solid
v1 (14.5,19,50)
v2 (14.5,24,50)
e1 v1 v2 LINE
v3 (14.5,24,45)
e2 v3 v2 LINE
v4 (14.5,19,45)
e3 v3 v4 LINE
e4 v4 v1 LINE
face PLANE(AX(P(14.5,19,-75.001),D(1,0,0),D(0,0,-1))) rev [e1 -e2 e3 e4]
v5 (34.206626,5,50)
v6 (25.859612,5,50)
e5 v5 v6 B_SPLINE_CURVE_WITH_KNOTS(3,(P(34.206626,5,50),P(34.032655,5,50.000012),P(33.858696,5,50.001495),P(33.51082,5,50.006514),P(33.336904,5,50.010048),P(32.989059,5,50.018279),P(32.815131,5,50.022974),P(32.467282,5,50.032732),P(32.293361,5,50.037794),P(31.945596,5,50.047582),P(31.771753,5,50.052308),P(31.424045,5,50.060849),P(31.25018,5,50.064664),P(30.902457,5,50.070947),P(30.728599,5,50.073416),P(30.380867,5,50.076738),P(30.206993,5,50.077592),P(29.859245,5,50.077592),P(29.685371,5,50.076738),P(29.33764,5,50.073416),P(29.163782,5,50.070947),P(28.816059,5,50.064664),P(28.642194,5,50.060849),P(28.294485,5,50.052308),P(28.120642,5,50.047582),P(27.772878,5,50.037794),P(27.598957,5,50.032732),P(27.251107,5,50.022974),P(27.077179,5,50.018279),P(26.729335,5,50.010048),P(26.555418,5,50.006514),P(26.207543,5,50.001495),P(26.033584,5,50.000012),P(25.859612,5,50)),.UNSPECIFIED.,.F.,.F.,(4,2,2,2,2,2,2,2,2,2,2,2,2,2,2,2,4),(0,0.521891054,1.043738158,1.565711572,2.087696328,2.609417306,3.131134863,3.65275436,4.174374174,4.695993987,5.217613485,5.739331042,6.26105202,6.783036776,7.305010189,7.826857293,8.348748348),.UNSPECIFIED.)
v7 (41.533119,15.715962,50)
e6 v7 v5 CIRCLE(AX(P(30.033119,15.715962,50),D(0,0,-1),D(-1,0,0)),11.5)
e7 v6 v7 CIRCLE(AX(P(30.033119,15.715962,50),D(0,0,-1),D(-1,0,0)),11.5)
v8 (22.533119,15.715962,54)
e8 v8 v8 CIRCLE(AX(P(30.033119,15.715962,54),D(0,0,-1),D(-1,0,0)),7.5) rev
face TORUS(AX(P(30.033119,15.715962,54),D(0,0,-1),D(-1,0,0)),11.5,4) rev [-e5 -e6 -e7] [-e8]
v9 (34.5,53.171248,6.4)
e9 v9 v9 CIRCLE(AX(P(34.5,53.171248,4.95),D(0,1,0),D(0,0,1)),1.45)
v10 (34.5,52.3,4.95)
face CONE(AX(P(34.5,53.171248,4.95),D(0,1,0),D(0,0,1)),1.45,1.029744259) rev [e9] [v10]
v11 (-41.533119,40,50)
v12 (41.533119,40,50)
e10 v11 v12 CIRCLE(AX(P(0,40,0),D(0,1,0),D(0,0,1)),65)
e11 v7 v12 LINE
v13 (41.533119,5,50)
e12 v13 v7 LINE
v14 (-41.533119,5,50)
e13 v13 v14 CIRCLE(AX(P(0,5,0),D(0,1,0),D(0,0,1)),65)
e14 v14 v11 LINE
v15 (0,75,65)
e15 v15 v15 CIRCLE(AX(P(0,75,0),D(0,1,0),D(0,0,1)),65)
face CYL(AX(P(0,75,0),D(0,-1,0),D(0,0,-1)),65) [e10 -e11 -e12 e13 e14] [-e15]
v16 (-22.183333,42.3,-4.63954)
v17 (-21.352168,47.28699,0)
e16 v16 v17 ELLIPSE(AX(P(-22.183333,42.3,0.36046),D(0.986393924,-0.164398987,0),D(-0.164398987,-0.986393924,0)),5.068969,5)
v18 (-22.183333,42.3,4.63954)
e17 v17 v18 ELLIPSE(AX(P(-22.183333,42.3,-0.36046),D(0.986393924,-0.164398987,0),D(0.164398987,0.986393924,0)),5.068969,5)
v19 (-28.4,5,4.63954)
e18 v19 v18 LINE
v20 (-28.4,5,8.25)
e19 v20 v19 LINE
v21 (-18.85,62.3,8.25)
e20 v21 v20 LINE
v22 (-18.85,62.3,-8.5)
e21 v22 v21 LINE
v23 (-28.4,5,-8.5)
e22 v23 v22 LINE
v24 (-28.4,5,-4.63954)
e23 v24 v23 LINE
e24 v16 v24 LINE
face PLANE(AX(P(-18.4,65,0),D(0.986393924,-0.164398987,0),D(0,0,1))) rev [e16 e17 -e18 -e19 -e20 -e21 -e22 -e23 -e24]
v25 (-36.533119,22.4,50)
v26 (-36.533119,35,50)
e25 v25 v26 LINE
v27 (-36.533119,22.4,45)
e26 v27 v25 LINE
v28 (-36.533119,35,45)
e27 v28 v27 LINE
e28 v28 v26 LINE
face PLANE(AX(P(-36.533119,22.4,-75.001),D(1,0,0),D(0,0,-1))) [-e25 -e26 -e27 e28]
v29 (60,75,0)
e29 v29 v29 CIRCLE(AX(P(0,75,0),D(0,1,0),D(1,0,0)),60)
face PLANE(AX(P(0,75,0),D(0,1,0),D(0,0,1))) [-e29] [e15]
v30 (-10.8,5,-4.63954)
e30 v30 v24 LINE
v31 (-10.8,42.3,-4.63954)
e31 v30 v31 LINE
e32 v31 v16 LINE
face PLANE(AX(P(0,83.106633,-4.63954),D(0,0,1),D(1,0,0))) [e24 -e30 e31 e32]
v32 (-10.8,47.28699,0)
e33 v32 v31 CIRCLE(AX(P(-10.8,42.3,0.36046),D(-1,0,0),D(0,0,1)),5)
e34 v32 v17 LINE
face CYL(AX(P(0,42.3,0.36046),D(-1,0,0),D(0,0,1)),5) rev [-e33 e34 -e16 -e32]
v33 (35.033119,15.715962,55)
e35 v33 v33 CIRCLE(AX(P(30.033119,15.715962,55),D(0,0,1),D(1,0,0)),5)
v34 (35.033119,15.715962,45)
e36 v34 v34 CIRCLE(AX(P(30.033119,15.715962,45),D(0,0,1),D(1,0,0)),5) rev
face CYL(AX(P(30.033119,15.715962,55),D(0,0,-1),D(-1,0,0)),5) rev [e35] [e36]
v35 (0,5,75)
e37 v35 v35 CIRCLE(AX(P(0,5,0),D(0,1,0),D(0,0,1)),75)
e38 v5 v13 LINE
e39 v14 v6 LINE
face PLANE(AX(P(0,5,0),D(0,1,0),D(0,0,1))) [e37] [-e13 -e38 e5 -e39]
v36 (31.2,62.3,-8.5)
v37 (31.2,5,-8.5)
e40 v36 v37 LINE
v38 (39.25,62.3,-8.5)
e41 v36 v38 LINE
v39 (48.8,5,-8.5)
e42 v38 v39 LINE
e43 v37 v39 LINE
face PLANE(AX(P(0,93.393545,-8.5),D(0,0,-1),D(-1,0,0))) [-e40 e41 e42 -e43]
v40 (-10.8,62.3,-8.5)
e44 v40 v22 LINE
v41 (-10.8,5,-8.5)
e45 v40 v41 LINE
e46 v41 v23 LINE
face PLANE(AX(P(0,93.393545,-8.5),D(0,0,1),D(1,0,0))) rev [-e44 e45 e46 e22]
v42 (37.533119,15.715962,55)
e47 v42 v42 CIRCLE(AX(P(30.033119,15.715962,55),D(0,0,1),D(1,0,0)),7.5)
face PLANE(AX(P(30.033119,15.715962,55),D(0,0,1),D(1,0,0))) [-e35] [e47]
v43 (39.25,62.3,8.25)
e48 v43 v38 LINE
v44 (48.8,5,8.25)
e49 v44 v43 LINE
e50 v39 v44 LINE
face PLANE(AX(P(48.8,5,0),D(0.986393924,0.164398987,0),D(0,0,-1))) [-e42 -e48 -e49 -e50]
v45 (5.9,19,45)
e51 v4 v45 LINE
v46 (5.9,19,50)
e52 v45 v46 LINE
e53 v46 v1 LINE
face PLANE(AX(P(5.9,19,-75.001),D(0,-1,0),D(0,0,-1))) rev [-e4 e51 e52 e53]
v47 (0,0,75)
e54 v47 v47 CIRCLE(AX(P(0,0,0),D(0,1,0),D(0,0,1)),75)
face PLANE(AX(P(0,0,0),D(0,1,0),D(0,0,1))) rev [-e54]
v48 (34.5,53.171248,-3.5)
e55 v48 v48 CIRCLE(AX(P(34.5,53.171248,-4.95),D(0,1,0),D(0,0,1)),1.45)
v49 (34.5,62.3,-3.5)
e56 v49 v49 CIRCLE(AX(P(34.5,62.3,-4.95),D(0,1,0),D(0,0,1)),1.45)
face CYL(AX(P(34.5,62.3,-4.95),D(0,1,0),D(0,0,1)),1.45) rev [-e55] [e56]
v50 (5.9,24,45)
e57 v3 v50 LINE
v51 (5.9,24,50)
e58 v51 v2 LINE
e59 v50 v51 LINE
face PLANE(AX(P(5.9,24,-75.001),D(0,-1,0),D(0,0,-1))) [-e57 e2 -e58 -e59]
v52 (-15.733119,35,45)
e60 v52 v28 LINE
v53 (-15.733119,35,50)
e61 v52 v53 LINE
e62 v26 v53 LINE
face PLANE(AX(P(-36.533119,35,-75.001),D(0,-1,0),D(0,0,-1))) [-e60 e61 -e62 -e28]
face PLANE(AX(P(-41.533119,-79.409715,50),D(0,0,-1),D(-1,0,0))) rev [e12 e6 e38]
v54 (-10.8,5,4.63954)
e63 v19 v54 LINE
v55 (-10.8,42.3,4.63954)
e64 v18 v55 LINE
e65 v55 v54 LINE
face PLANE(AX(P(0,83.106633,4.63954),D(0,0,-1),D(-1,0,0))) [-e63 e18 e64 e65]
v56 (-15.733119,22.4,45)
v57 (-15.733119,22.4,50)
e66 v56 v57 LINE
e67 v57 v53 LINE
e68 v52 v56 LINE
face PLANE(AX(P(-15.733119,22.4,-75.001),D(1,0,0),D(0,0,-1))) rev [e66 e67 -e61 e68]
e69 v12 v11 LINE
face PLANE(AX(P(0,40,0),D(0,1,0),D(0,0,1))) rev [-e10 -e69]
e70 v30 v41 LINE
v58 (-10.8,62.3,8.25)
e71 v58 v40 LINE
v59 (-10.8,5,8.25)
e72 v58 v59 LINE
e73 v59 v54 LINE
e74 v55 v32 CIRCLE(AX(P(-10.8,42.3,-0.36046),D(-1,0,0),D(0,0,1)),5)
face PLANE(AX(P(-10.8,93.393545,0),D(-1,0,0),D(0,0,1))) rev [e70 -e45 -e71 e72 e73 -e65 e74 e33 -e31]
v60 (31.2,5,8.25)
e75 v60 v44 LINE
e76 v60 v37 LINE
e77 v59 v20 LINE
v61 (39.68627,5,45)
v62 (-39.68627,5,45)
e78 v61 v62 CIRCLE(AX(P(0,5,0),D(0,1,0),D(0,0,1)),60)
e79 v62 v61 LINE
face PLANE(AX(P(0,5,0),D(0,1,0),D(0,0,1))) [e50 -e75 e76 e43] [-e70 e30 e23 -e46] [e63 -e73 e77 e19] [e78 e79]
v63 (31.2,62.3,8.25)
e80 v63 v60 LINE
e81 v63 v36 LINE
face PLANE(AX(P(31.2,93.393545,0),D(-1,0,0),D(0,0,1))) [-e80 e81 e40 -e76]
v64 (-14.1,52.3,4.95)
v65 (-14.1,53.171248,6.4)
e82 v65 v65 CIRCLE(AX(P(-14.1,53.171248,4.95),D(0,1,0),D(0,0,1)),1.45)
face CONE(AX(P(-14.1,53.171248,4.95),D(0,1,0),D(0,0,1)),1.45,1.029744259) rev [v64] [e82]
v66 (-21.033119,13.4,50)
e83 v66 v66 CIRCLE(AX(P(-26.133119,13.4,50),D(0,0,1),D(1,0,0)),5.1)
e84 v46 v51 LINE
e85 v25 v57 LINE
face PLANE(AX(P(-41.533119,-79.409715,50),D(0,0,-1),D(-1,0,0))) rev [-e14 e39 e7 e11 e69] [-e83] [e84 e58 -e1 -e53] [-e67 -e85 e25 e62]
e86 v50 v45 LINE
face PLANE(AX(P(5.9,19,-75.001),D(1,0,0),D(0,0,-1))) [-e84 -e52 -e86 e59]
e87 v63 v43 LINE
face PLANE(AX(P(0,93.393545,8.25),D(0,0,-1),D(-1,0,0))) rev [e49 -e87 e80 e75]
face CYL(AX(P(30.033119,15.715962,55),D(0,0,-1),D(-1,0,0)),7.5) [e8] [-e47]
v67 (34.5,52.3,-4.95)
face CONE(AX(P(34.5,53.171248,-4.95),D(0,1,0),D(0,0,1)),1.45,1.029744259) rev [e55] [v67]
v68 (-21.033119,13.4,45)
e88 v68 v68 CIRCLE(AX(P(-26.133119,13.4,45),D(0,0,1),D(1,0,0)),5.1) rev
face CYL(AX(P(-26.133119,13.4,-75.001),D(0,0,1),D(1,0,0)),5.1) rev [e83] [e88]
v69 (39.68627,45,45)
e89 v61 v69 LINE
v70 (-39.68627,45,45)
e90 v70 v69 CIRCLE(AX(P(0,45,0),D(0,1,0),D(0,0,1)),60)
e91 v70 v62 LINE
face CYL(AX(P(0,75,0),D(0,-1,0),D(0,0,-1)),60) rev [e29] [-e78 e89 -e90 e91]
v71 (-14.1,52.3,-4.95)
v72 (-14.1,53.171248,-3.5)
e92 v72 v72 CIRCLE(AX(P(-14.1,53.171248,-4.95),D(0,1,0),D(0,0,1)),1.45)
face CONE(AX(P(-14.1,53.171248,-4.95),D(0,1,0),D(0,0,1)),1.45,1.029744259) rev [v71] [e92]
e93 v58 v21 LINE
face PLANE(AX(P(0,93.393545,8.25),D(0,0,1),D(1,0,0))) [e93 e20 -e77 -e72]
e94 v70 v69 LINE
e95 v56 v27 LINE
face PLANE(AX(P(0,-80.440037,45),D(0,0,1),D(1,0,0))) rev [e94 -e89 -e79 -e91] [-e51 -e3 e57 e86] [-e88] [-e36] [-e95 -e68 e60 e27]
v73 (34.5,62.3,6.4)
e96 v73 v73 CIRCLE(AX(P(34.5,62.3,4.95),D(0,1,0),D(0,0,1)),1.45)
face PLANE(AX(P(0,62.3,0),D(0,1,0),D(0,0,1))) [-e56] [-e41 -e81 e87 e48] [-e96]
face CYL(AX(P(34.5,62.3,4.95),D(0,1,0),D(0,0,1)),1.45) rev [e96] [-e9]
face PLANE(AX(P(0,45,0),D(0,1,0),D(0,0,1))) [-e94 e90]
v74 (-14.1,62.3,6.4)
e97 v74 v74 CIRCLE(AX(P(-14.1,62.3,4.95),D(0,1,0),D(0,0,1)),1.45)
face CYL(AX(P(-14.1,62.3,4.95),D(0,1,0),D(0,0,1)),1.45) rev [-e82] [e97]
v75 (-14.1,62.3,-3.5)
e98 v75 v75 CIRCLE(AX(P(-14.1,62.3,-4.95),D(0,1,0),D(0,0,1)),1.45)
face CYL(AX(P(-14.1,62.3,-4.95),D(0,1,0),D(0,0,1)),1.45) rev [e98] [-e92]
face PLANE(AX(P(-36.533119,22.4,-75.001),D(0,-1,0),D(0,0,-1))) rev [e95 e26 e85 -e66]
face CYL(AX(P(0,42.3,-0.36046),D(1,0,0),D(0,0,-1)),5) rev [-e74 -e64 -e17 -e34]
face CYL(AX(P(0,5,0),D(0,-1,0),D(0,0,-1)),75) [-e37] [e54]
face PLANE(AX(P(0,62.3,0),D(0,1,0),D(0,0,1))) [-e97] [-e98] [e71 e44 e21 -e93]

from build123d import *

# Parameters (mm, degrees)
SKETCH4_R                   = 65
SKETCH4_R_2                 = 60
EXTRUDE_THIN1_DEPTH         = 75
SKETCH5_R                   = 75
BOSS_EXTRUDE1_DEPTH         = 5
BOSS_EXTRUDE2_START         = -40
SKETCH6_W                   = 83.06623863
SKETCH6_H                   = 5
BOSS_EXTRUDE2_DEPTH         = 40
CUT_EXTRUDE1_START          = -40
CUT_EXTRUDE1_DEPTH          = 35
SKETCH8_W                   = 7.6
SKETCH8_H                   = 16.75
BOSS_EXTRUDE3_DEPTH         = 57.3
CHAMFER1_SIZE               = 10
CHAMFER1_SIZE_2             = 60
M3_5X0_6_TAPPED_HOLE1_D     = 2.9
M3_5X0_6_TAPPED_HOLE1_DEPTH = 9.128752102
M3_5X0_6_TAPPED_HOLE1_TIP   = 0.871247898
CUT_EXTRUDE2_START          = -57.3
SKETCH11_W                  = 18.622960368
SKETCH11_H                  = 9.279079534
CUT_EXTRUDE2_DEPTH          = 42.3
FILLET1_R                   = 5
CUT_EXTRUDE3_REACH          = 165.936
SKETCH12_R                  = 5.1
SKETCH12_W                  = 20.8
SKETCH12_H                  = 12.6
SKETCH12_W_2                = 8.6
SKETCH12_H_2                = 5
SKETCH13_R                  = 7.5
SKETCH13_R_2                = 5
BOSS_EXTRUDE4_DEPTH         = 5
FILLET2_R                   = 4
CUT_EXTRUDE4_REACH          = 165.936
SKETCH14_R                  = 5


with BuildPart() as part:
    # Sketch4 → Extrude-Thin1 (new body)
    with BuildSketch(Plane(origin=(0, 0, 0), x_dir=(1, 0, 0), z_dir=(0, 1, 0))):
        Circle(SKETCH4_R)
        Circle(SKETCH4_R_2, mode=Mode.SUBTRACT)
    extrude(amount=EXTRUDE_THIN1_DEPTH)

    # Sketch5 → Boss-Extrude1 (add)
    with BuildSketch(Plane(origin=(0, 0, 0), x_dir=(1, 0, 0), z_dir=(0, 1, 0))):
        with Locations(Location((0, 0, 0), (0, 0, 270))):
            Circle(SKETCH5_R)
    extrude(amount=BOSS_EXTRUDE1_DEPTH)

    # Sketch6 → Boss-Extrude2 (add)
    with BuildSketch(Plane(origin=(0, 45, 0), x_dir=(1, 0, 0), z_dir=(0, 1, 0)).offset(BOSS_EXTRUDE2_START)):
        with Locations((0, -47.5)):
            Rectangle(SKETCH6_W, SKETCH6_H)
        with BuildLine():
            Line((41.533119315, -50), (0, -50))
            Line((0, -50), (0, -65))
            ThreePointArc((0, -65), (22.079402166, -61.135096303), (41.533119315, -50))
        make_face()
        with BuildLine():
            Line((0, -65), (0, -50))
            Line((0, -50), (-41.533119315, -50))
            ThreePointArc((-41.533119315, -50), (-22.079402166, -61.135096303), (0, -65))
        make_face()
        with BuildLine():
            Line((41.533119315, -50), (0, -50))
            Line((0, -50), (0, -65))
            ThreePointArc((0, -65), (22.079402166, -61.135096303), (41.533119315, -50))
        make_face()
        with BuildLine():
            Line((0, -65), (0, -50))
            Line((0, -50), (-41.533119315, -50))
            ThreePointArc((-41.533119315, -50), (-22.079402166, -61.135096303), (0, -65))
        make_face()
    extrude(amount=BOSS_EXTRUDE2_DEPTH)

    # Sketch7 → Cut-Extrude1 (cut)
    with BuildSketch(Plane(origin=(0, 45, 0), x_dir=(1, 0, 0), z_dir=(0, 1, 0)).offset(CUT_EXTRUDE1_START)):
        with BuildLine():
            Line((-41.533119315, -50), (41.533119315, -50))
            ThreePointArc((41.533119315, -50), (0, -65), (-41.533119315, -50))
        make_face()
    extrude(amount=CUT_EXTRUDE1_DEPTH, mode=Mode.SUBTRACT)

    # Sketch8 → Boss-Extrude3 (add)
    with BuildSketch(Plane(origin=(0, 5, 0), x_dir=(1, 0, 0), z_dir=(0, 1, 0))):
        with Locations((35, 0.125)):
            Rectangle(SKETCH8_W, SKETCH8_H)
        with Locations((-14.6, 0.125)):
            Rectangle(SKETCH8_W, SKETCH8_H)
    extrude(amount=BOSS_EXTRUDE3_DEPTH)

    # Chamfer1
    # the kernel refuses this chamfer: 60, 10 mm, written as the material it adds along each edge
    with BuildSketch(Plane(origin=(38.8, 5, -8.5), x_dir=(0.9750324932942595, -0.2220622368174739, 0), z_dir=(0, 0, 1))) as chamfer1_piece_1_section:
        Polygon((CHAMFER1_SIZE * 0.975032493294, CHAMFER1_SIZE * 0.222062236817), (-CHAMFER1_SIZE_2 * 0.222062236817, CHAMFER1_SIZE_2 * 0.975032493294), (0, 0), align=None)
    chamfer1_piece_1 = extrude(amount=16.75, mode=Mode.PRIVATE)
    chamfer1_piece_1 = split(chamfer1_piece_1, bisect_by=Plane(origin=(41.528502242, 62.3, -0.125), z_dir=(0, -1, 0)), keep=Keep.TOP, mode=Mode.PRIVATE)
    add(chamfer1_piece_1)
    with BuildSketch(Plane(origin=(-18.4, 5, -8.5), x_dir=(-0.9750324932942595, -0.2220622368174739, 0), z_dir=(0, 0, 1))) as chamfer1_piece_2_section:
        Polygon((CHAMFER1_SIZE * 0.975032493294, -CHAMFER1_SIZE * 0.222062236817), (-CHAMFER1_SIZE_2 * 0.222062236817, -CHAMFER1_SIZE_2 * 0.975032493294), (0, 0), align=None)
    chamfer1_piece_2 = extrude(amount=16.75, mode=Mode.PRIVATE)
    chamfer1_piece_2 = split(chamfer1_piece_2, bisect_by=Plane(origin=(-21.128502242, 62.3, -0.125), z_dir=(0, -1, 0)), keep=Keep.TOP, mode=Mode.PRIVATE)
    add(chamfer1_piece_2)

    # M3.5x0.6 Tapped Hole1
    with Locations(Plane(origin=(0, 62.3, 0), x_dir=(1, 0, 0), z_dir=(0, 1, 0))):
        with Locations((34.5, 4.95), (34.5, -4.95), (-14.1, 4.95), (-14.1, -4.95)):
            Hole(M3_5X0_6_TAPPED_HOLE1_D / 2, depth=M3_5X0_6_TAPPED_HOLE1_DEPTH)
            with Locations((0, 0, -(M3_5X0_6_TAPPED_HOLE1_DEPTH + M3_5X0_6_TAPPED_HOLE1_TIP / 2))):  # 118° drill point
                Cone(0, M3_5X0_6_TAPPED_HOLE1_D / 2, M3_5X0_6_TAPPED_HOLE1_TIP, mode=Mode.SUBTRACT)

    # Sketch11 → Cut-Extrude2 (cut)
    with BuildSketch(Plane(origin=(0, 62.3, 0), x_dir=(1, 0, 0), z_dir=(0, 1, 0)).offset(CUT_EXTRUDE2_START)):
        with Locations((-19.088519816, 0)):
            Rectangle(SKETCH11_W, SKETCH11_H)
    extrude(amount=CUT_EXTRUDE2_DEPTH, mode=Mode.SUBTRACT)

    # Fillet1
    # the kernel refuses this fillet: 5 mm, written as the material it adds along each edge
    with BuildSketch(Plane(origin=(-10.8, 47.3, -4.639539767), x_dir=(0, 0, 1), z_dir=(-1, 0, 0))) as fillet1_piece_1_section:
        with BuildLine():
            CenterArc((FILLET1_R, -FILLET1_R), FILLET1_R, 90, 90)
            Line((0, -FILLET1_R), (0, 0))
            Line((0, 0), (FILLET1_R, 0))
        make_face()
    fillet1_piece_1 = extrude(amount=23.05, mode=Mode.PRIVATE)
    fillet1_piece_1 = split(fillet1_piece_1, bisect_by=Plane(origin=(-21.396510454, 47.020937275, -3.518217567), z_dir=(0.9863939238321439, -0.1643989873053573, 0)), keep=Keep.TOP, mode=Mode.PRIVATE)
    add(fillet1_piece_1)
    with BuildSketch(Plane(origin=(-33.85, 47.3, 4.639539767), x_dir=(0, -1, 0), z_dir=(1, 0, 0))) as fillet1_piece_2_section:
        with BuildLine():
            CenterArc((FILLET1_R, FILLET1_R), FILLET1_R, 180, 90)
            Line((0, FILLET1_R), (0, 0))
            Line((0, 0), (FILLET1_R, 0))
        make_face()
    fillet1_piece_2 = extrude(amount=23.05, mode=Mode.PRIVATE)
    fillet1_piece_2 = split(fillet1_piece_2, bisect_by=Plane(origin=(-21.396510454, 47.020937275, 3.518217567), z_dir=(0.9863939238321439, -0.1643989873053573, 0)), keep=Keep.TOP, mode=Mode.PRIVATE)
    add(fillet1_piece_2)

    # Sketch12 → Cut-Extrude3 (cut, up to next)
    with BuildSketch(Plane.XY.offset(50), mode=Mode.PRIVATE) as cut_extrude3_sk1:
        with Locations((-26.133119315, 13.4)):
            Circle(SKETCH12_R)
    cut_extrude3_tool1 = extrude(cut_extrude3_sk1.sketch, amount=-CUT_EXTRUDE3_REACH, mode=Mode.PRIVATE) & part.part
    # Sketch12 → Cut-Extrude3 (cut, up to next)
    with BuildSketch(Plane.XY.offset(50), mode=Mode.PRIVATE) as cut_extrude3_sk2:
        with Locations((-26.133119315, 28.7)):
            Rectangle(SKETCH12_W, SKETCH12_H)
    cut_extrude3_tool2 = extrude(cut_extrude3_sk2.sketch, amount=-CUT_EXTRUDE3_REACH, mode=Mode.PRIVATE) & part.part
    # Sketch12 → Cut-Extrude3 (cut, up to next)
    with BuildSketch(Plane.XY.offset(50), mode=Mode.PRIVATE) as cut_extrude3_sk3:
        with Locations((10.2, 21.5)):
            Rectangle(SKETCH12_W_2, SKETCH12_H_2)
    cut_extrude3_tool3 = extrude(cut_extrude3_sk3.sketch, amount=-CUT_EXTRUDE3_REACH, mode=Mode.PRIVATE) & part.part
    add(cut_extrude3_tool1.solids().sort_by_distance((-26.133119, 13.4, 50))[0], mode=Mode.SUBTRACT)
    add(cut_extrude3_tool2.solids().sort_by_distance((-26.133119, 28.7, 50))[0], mode=Mode.SUBTRACT)
    add(cut_extrude3_tool3.solids().sort_by_distance((10.2, 21.5, 50))[0], mode=Mode.SUBTRACT)

    # Sketch13 → Boss-Extrude4 (add)
    with BuildSketch(Plane.XY.offset(50)):
        with Locations(Location((30.033119315, 15.715961892, 0), (0, 0, 180))):
            Circle(SKETCH13_R)
        with Locations((30.033119315, 15.715961892)):
            Circle(SKETCH13_R_2, mode=Mode.SUBTRACT)
    extrude(amount=BOSS_EXTRUDE4_DEPTH)

    # Fillet2
    # the kernel refuses this fillet: 4 mm, written as the material it adds along each edge
    with BuildSketch(Plane(origin=(30.033119315, 15.715961892, 50), x_dir=(-1, 0, 0), z_dir=(0, 1, 0))) as fillet2_piece_1:
        with BuildLine():
            CenterArc((7.5 + FILLET2_R, FILLET2_R), FILLET2_R, 180, 90)
            Line((7.5, FILLET2_R), (7.5, 0))
            Line((7.5, 0), (7.5 + FILLET2_R, 0))
        make_face()
    revolve(axis=Axis((30.033119315, 15.715961892, 50), (0, 0, 1)))

    # Sketch14 → Cut-Extrude4 (cut, up to next)
    with BuildSketch(Plane.XY.offset(50), mode=Mode.PRIVATE) as cut_extrude4_sk1:
        with Locations((30.033119315, 15.715961892)):
            Circle(SKETCH14_R)
    cut_extrude4_tool1 = extrude(cut_extrude4_sk1.sketch, amount=-CUT_EXTRUDE4_REACH, mode=Mode.PRIVATE) & part.part
    add(cut_extrude4_tool1.solids().sort_by_distance((30.033119, 15.715962, 50))[0], mode=Mode.SUBTRACT)


solid = part.part
